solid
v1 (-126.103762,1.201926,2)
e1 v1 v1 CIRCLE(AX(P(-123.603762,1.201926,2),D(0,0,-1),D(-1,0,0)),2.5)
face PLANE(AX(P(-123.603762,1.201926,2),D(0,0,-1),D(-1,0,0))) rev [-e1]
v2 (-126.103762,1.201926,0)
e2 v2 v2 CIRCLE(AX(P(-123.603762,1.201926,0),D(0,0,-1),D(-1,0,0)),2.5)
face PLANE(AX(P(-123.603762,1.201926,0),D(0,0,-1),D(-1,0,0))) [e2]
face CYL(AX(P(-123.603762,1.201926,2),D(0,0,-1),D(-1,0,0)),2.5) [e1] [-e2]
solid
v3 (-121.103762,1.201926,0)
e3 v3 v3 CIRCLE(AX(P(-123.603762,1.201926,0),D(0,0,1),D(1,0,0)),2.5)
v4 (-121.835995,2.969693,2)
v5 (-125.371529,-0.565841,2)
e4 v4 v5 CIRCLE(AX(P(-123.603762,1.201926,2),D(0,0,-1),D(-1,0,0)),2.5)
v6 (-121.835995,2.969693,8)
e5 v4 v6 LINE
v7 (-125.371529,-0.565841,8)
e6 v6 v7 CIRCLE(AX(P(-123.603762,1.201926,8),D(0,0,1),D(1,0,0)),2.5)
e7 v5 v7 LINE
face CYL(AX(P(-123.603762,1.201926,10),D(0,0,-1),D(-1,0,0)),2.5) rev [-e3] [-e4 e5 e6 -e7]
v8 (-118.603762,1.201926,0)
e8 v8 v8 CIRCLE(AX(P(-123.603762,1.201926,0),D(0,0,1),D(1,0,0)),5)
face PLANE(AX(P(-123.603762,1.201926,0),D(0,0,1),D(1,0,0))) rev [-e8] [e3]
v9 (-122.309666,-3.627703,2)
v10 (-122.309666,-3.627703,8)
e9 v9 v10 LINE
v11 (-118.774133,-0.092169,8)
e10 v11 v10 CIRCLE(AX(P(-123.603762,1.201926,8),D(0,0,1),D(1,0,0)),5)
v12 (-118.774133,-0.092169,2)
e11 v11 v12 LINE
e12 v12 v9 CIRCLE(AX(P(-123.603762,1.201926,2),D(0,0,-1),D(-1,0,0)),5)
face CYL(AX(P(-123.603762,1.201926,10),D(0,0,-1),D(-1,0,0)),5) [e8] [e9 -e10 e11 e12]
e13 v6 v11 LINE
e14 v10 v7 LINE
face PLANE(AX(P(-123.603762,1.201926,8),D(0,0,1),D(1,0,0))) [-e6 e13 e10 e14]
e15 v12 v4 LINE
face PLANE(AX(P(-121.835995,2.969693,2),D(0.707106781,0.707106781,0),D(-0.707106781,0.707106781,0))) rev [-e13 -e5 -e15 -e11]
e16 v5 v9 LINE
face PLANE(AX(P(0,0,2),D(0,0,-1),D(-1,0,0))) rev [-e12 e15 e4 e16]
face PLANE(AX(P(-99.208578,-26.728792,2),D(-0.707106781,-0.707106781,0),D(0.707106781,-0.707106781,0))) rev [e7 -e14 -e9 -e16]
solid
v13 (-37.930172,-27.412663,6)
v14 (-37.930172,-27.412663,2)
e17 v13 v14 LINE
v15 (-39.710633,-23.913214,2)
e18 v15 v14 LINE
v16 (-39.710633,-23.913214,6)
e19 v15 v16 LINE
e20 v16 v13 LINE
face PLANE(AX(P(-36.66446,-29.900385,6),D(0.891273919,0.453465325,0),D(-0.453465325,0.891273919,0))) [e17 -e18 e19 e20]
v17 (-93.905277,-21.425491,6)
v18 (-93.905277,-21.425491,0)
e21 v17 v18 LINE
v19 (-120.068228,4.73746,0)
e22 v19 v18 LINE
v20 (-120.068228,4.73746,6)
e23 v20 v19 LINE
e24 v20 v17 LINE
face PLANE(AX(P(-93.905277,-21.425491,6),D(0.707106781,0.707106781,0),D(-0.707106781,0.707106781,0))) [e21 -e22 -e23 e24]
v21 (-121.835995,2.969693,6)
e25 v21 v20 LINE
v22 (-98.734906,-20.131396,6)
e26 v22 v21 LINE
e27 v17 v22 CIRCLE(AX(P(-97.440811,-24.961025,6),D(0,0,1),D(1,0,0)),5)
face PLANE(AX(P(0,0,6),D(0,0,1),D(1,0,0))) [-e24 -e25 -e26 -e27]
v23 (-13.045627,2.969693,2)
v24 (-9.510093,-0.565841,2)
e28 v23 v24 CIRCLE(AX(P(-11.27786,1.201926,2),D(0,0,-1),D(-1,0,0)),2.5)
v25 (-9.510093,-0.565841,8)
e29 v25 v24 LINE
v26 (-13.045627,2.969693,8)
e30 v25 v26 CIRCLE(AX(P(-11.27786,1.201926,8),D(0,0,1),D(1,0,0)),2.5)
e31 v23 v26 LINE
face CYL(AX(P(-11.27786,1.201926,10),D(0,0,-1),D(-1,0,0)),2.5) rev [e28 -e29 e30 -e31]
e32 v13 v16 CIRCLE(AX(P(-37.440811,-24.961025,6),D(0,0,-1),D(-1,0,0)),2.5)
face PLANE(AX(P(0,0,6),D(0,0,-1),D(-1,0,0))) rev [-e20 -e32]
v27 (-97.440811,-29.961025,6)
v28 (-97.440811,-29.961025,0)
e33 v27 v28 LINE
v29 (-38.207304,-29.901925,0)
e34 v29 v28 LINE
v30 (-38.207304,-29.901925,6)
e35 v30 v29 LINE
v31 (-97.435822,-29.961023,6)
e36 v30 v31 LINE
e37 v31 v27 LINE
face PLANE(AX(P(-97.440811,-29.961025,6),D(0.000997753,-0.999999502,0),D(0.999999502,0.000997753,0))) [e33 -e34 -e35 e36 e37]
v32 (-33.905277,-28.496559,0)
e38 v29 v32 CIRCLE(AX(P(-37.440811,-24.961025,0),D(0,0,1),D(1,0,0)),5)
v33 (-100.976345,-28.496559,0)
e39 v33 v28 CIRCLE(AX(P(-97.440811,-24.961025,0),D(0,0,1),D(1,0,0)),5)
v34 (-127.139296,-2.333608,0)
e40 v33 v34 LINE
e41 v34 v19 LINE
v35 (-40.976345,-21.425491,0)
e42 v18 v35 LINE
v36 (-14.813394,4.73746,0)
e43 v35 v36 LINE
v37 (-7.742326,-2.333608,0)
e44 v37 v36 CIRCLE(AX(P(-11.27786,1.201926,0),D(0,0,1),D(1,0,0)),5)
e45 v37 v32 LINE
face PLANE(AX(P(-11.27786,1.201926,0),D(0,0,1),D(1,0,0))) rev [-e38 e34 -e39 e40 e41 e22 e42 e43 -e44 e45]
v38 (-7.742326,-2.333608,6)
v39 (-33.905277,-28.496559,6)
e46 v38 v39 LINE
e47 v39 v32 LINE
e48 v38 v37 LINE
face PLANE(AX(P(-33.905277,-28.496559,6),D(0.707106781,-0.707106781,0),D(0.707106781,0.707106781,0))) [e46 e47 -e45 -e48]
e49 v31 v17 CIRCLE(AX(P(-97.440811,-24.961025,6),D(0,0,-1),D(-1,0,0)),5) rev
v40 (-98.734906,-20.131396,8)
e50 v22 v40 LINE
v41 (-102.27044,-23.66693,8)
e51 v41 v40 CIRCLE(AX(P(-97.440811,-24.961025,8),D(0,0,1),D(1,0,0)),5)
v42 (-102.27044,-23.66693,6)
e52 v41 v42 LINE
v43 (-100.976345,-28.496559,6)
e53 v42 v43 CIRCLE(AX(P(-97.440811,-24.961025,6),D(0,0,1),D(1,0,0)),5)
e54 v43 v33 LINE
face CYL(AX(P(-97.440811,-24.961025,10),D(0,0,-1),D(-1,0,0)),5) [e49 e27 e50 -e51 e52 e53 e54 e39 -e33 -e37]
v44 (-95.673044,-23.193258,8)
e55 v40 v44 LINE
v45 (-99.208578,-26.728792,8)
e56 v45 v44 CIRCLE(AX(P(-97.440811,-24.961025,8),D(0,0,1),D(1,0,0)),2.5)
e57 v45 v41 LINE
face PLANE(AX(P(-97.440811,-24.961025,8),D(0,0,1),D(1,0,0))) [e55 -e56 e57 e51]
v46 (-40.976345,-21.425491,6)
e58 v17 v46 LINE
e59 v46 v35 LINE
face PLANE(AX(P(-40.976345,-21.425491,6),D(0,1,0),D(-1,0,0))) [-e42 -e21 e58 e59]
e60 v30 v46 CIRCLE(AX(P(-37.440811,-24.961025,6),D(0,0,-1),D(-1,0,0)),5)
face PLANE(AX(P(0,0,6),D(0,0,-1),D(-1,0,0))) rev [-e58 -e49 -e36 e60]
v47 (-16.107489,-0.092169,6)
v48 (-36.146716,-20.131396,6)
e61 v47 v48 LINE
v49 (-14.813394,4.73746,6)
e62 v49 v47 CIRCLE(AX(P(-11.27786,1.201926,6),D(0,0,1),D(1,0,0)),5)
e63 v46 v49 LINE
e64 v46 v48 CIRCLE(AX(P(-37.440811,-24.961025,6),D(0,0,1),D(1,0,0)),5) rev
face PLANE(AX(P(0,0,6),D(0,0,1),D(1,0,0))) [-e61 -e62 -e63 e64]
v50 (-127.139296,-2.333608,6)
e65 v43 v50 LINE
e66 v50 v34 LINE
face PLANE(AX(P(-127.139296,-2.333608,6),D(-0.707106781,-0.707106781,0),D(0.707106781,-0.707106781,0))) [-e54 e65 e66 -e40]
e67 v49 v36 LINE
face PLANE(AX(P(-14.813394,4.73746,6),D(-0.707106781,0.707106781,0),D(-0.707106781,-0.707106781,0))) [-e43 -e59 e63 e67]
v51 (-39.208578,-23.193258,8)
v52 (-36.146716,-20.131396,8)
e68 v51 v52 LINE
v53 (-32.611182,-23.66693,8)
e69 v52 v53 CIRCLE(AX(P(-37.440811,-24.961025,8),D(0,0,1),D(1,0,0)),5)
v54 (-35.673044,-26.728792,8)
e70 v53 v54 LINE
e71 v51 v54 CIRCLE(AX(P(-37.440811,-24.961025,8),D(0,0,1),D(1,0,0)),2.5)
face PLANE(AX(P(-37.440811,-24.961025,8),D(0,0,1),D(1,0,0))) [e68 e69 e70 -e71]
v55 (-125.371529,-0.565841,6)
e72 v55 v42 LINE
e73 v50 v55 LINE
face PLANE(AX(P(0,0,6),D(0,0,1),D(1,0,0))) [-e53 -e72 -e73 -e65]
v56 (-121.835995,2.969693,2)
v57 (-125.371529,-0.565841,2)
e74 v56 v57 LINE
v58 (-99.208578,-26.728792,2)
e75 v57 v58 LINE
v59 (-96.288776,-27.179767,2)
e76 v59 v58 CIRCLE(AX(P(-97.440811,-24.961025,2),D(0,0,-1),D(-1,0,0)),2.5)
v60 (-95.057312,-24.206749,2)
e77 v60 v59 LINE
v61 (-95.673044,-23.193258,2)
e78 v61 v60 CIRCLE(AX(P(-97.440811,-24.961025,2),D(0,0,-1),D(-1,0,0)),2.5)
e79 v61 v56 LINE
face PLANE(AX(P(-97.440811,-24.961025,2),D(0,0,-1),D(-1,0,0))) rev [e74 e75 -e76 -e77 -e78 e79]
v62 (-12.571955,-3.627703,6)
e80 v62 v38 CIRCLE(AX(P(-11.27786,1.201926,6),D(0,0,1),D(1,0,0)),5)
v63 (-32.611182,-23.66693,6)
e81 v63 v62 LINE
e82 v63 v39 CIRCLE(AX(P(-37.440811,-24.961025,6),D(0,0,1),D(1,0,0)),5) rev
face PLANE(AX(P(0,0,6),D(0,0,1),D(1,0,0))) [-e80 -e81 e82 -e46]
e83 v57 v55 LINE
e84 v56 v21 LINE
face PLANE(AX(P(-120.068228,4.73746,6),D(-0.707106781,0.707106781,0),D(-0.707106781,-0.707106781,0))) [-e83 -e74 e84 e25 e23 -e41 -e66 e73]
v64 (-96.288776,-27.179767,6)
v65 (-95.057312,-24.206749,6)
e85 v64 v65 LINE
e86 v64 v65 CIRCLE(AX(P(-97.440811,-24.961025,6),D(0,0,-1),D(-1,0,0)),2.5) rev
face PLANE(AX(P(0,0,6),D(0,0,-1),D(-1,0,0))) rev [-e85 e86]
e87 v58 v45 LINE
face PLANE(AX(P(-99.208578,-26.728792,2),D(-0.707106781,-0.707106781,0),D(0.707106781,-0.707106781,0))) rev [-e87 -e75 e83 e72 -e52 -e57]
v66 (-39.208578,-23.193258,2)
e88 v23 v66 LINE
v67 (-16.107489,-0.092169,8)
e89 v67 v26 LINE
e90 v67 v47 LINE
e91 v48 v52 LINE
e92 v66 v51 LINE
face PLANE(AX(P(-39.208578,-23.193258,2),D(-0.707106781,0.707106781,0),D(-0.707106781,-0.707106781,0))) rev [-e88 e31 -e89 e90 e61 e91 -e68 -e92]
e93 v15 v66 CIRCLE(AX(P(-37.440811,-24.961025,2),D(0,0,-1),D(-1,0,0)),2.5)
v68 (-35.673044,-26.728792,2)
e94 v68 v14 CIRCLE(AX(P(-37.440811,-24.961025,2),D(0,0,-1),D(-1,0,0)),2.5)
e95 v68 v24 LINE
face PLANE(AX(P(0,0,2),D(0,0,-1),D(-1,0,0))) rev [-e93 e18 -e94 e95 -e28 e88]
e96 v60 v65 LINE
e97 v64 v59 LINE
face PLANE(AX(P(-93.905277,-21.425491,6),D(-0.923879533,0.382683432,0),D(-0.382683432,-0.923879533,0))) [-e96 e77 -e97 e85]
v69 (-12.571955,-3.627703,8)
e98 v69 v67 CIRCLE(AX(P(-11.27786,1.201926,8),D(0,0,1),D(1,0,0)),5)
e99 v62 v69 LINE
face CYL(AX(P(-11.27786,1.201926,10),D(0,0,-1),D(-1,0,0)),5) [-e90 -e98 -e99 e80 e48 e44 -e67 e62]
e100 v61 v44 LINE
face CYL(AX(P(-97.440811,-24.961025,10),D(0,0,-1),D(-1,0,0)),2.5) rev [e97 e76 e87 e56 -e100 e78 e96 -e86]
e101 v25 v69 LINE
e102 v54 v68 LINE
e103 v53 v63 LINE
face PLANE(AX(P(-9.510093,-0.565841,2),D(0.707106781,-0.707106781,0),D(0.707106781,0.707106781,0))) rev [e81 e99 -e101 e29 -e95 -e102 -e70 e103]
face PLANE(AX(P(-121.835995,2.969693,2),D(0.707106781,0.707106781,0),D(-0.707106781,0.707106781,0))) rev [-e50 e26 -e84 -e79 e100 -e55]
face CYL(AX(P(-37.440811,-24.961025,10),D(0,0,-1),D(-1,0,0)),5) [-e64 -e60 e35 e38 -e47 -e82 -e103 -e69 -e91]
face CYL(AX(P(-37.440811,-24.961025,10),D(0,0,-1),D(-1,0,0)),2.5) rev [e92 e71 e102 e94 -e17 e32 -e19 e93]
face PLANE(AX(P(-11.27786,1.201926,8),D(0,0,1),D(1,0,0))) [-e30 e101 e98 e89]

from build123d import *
from build123d.topology import SkipClean

# Parameters (mm, degrees)
SKETCH_1_R            = 5
SKETCH_1_R_2          = 2.5
EXTRUDE_1_DEPTH       = 10
EXTRUDE_1_2_DEPTH     = 10
EXTRUDE_1_3_DEPTH     = 10
EXTRUDE_1_4_DEPTH     = 10
EXTRUDE_2_DEPTH       = 6
CUT_EXTRUDE_1_DEPTH   = 4
EXTRUDE_START         = -2
EXTRUDE_3_OUTLINE_R   = 2.5
EXTRUDE_3_DEPTH       = 2
EXTRUDE_3_2_DEPTH     = 2
EXTRUDE_3_3_OUTLINE_R = 2.5
EXTRUDE_3_3_DEPTH     = 2
CUT_EXTRUDE_2_DEPTH   = 4
CUT_EXTRUDE_6_DEPTH   = 8
EXTRUDE_4_DEPTH       = 6
CUT_EXTRUDE_START     = -2
CUT_EXTRUDE_8_DEPTH   = 2
CUT_EXTRUDE_8_2_DEPTH = 2


with BuildPart() as part:
    # Эскиз1 → Бобышка-Вытянуть1 (new body)
    with BuildSketch(Plane.XY):
        with Locations((-11.277859903, 1.201925786)):
            Circle(SKETCH_1_R)
        with Locations((-11.277859903, 1.201925786)):
            Circle(SKETCH_1_R_2, mode=Mode.SUBTRACT)
    extrude(amount=EXTRUDE_1_DEPTH)



with BuildPart() as body_2:
    # Эскиз1 → Extrude 1 2 (new body)
    with BuildSketch(Plane.XY):
        with Locations((-37.440810807, -24.961025118)):
            Circle(SKETCH_1_R)
        with Locations((-37.440810807, -24.961025118)):
            Circle(SKETCH_1_R_2, mode=Mode.SUBTRACT)
    extrude(amount=EXTRUDE_1_2_DEPTH)


with BuildPart() as body_3:
    # Эскиз1 → Extrude 1 3 (new body)
    with BuildSketch(Plane.XY):
        with Locations((-97.440810807, -24.961025118)):
            Circle(SKETCH_1_R)
        with Locations((-97.440810807, -24.961025118)):
            Circle(SKETCH_1_R_2, mode=Mode.SUBTRACT)
    extrude(amount=EXTRUDE_1_3_DEPTH)


with BuildPart() as body_4:
    # Эскиз1 → Extrude 1 4 (new body)
    with BuildSketch(Plane.XY):
        with Locations((-123.603761711, 1.201925786)):
            Circle(SKETCH_1_R)
        with Locations((-123.603761711, 1.201925786)):
            Circle(SKETCH_1_R_2, mode=Mode.SUBTRACT)
    extrude(amount=EXTRUDE_1_4_DEPTH)


with BuildPart() as part_1:
    add(part.part)

    add(body_2.part)  # Бобышка-Вытянуть2 merges body 2
    # Эскиз3 → Бобышка-Вытянуть2 (add)
    with BuildSketch(Plane(origin=(0, 0, 0), x_dir=(-1, 0, 0), z_dir=(0, 0, -1))):
        Polygon((11.277859903, 1.201925786), (14.813393809, 4.737459692), (40.976344713, -21.425491212), (33.905276901, -28.496559024), (7.742325997, -2.33360812), align=None)
        Polygon((97.440810807, -24.961025118), (93.905276901, -21.425491212), (120.068227805, 4.737459692), (127.139295617, -2.33360812), (100.976344713, -28.496559024), align=None)
    extrude(amount=-EXTRUDE_2_DEPTH)

    # Эскиз4 → Вырез-Вытянуть1 (cut)
    with BuildSketch(Plane.XY.offset(6)):
        Polygon((-13.045626856, 2.969692739), (-9.51009295, -0.565841167), (-35.673043854, -26.728792071), (-39.20857776, -23.193258165), align=None)
    extrude(amount=-CUT_EXTRUDE_1_DEPTH, mode=Mode.SUBTRACT)

    # Extrude 3 2 outline → Extrude 3 2 (add)
    with BuildSketch(Plane(origin=(0, 0, 0), x_dir=(-1, 0, 0), z_dir=(0, 0, -1)).offset(EXTRUDE_START)):
        with BuildLine():
            Line((9.51009295, -0.565841167), (13.045626856, 2.969692739))
            ThreePointArc((13.045626856, 2.969692739), (9.51009295, 2.969692739), (9.51009295, -0.565841167))
        make_face()
        with BuildLine():
            Line((39.20857776, -23.193258165), (35.673043854, -26.728792071))
            ThreePointArc((35.673043854, -26.728792071), (39.20857776, -26.728792071), (39.20857776, -23.193258165))
        make_face()
    extrude(amount=EXTRUDE_3_2_DEPTH)

    # Эскиз4<2> → Вырез-Вытянуть2 (cut)
    with BuildSketch(Plane.XY.offset(6)):
        Polygon((-13.045626856, 2.969692739), (-9.51009295, -0.565841167), (-35.673043854, -26.728792071), (-39.20857776, -23.193258165), align=None)
    extrude(amount=CUT_EXTRUDE_2_DEPTH, mode=Mode.SUBTRACT)


with BuildPart() as body_4_2:
    # Бобышка-Вытянуть3: read off the stored shape, not the designer's step
    # Бобышка-Вытянуть3 outline → Бобышка-Вытянуть3 (new body)
    with BuildSketch(Plane(origin=(0, 0, 0), x_dir=(-1, 0, 0), z_dir=(0, 0, -1)).offset(EXTRUDE_START)):
        with Locations((123.603761711, 1.201925786)):
            Circle(EXTRUDE_3_OUTLINE_R)
    extrude(amount=EXTRUDE_3_DEPTH)


with BuildPart() as body_5:
    # Extrude 3 3 outline → Extrude 3 3 (new body)
    with BuildSketch(Plane(origin=(0, 0, 0), x_dir=(-1, 0, 0), z_dir=(0, 0, -1)).offset(EXTRUDE_START)):
        with Locations((97.440810807, -24.961025118)):
            Circle(EXTRUDE_3_3_OUTLINE_R)
    extrude(amount=EXTRUDE_3_3_DEPTH)


with BuildPart() as cut_extrude_6_tool:
    # Эскиз9 → Вырез-Вытянуть6 (new body)
    with BuildSketch(Plane.XY.offset(10)):
        Polygon((-123.603761711, 1.201925786), (-121.835994758, 2.969692739), (-95.673043854, -23.193258165), (-99.20857776, -26.728792071), (-125.371528664, -0.565841167), align=None)
    extrude(amount=-CUT_EXTRUDE_6_DEPTH)


with BuildPart() as part_2:
    add(part_1.part)

    # Вырез-Вытянуть6: cut by cut_extrude_6_tool
    add(cut_extrude_6_tool.part, mode=Mode.SUBTRACT)



with BuildPart() as body_3_1:
    add(body_3.part)

    # Вырез-Вытянуть6: cut by cut_extrude_6_tool
    add(cut_extrude_6_tool.part, mode=Mode.SUBTRACT)


with BuildPart() as body_4_1:
    add(body_4.part)

    # Вырез-Вытянуть6: cut by cut_extrude_6_tool
    add(cut_extrude_6_tool.part, mode=Mode.SUBTRACT)

    # Вырез-Вытянуть8: read off the stored shape, not the designer's step
    # Вырез-Вытянуть8 outline → Вырез-Вытянуть8 (cut)
    with BuildSketch(Plane.XY.offset(10).offset(CUT_EXTRUDE_START)):
        with BuildLine():
            ThreePointArc((-118.774132579, -0.092169439), (-127.139295617, 4.737459691), (-122.309666485, -3.627703345))
            Line((-122.309666485, -3.627703345), (-125.371528664, -0.565841167))
            ThreePointArc((-125.371528664, -0.565841167), (-125.371528664, 2.969692739), (-121.835994758, 2.969692739))
            Line((-121.835994758, 2.969692739), (-118.774132579, -0.092169439))
        make_face()
    extrude(amount=CUT_EXTRUDE_8_DEPTH, mode=Mode.SUBTRACT)


with BuildPart() as part_3:
    with SkipClean():  # the faces are left unmerged after this step: merging them gives an invalid solid
        add(part_2.part)

        add(body_3_1.part)  # Бобышка-Вытянуть4 merges body 3

        add(body_5.part)  # Бобышка-Вытянуть4 merges body 5
        # Эскиз10 → Бобышка-Вытянуть4 (add)
        with BuildSketch(Plane(origin=(0, 0, 0), x_dir=(-1, 0, 0), z_dir=(0, 0, -1))):
            Polygon((40.976344713, -21.425491212), (93.905276901, -21.425491212), (97.440810807, -29.961025118), (36.664459762, -29.900385305), align=None)
        extrude(amount=-EXTRUDE_4_DEPTH)

    # Cut-Extrude 8 2 outline → Cut-Extrude 8 2 (cut)
    with SkipClean():  # the faces are left unmerged after this step: merging them gives an invalid solid
        with BuildSketch(Plane.XY.offset(10).offset(CUT_EXTRUDE_START)):
            with BuildLine():
                Line((-32.611181676, -23.666929892), (-35.673043854, -26.728792071))
                ThreePointArc((-35.673043854, -26.728792071), (-39.20857776, -26.728792071), (-39.20857776, -23.193258165))
                Line((-39.20857776, -23.193258165), (-36.146715581, -20.131395986))
                ThreePointArc((-36.146715581, -20.131395986), (-40.976344714, -28.496559023), (-32.611181676, -23.666929892))
            make_face()
            with BuildLine():
                Line((-9.51009295, -0.565841167), (-12.571955129, -3.627703345))
                ThreePointArc((-12.571955129, -3.627703345), (-7.742325998, 4.737459693), (-16.107489035, -0.092169439))
                Line((-16.107489035, -0.092169439), (-13.045626856, 2.969692739))
                ThreePointArc((-13.045626856, 2.969692739), (-9.51009295, 2.969692739), (-9.51009295, -0.565841167))
            make_face()
            with BuildLine():
                Line((-98.734906032, -20.131395986), (-95.673043854, -23.193258165))
                ThreePointArc((-95.673043854, -23.193258165), (-95.673043854, -26.728792071), (-99.20857776, -26.728792071))
                Line((-99.20857776, -26.728792071), (-102.270439938, -23.666929892))
                ThreePointArc((-102.270439938, -23.666929892), (-93.9052769, -28.496559023), (-98.734906032, -20.131395986))
            make_face()
        extrude(amount=CUT_EXTRUDE_8_2_DEPTH, mode=Mode.SUBTRACT)


solid = Compound([body_4_2.part, body_4_1.part, part_3.part])
